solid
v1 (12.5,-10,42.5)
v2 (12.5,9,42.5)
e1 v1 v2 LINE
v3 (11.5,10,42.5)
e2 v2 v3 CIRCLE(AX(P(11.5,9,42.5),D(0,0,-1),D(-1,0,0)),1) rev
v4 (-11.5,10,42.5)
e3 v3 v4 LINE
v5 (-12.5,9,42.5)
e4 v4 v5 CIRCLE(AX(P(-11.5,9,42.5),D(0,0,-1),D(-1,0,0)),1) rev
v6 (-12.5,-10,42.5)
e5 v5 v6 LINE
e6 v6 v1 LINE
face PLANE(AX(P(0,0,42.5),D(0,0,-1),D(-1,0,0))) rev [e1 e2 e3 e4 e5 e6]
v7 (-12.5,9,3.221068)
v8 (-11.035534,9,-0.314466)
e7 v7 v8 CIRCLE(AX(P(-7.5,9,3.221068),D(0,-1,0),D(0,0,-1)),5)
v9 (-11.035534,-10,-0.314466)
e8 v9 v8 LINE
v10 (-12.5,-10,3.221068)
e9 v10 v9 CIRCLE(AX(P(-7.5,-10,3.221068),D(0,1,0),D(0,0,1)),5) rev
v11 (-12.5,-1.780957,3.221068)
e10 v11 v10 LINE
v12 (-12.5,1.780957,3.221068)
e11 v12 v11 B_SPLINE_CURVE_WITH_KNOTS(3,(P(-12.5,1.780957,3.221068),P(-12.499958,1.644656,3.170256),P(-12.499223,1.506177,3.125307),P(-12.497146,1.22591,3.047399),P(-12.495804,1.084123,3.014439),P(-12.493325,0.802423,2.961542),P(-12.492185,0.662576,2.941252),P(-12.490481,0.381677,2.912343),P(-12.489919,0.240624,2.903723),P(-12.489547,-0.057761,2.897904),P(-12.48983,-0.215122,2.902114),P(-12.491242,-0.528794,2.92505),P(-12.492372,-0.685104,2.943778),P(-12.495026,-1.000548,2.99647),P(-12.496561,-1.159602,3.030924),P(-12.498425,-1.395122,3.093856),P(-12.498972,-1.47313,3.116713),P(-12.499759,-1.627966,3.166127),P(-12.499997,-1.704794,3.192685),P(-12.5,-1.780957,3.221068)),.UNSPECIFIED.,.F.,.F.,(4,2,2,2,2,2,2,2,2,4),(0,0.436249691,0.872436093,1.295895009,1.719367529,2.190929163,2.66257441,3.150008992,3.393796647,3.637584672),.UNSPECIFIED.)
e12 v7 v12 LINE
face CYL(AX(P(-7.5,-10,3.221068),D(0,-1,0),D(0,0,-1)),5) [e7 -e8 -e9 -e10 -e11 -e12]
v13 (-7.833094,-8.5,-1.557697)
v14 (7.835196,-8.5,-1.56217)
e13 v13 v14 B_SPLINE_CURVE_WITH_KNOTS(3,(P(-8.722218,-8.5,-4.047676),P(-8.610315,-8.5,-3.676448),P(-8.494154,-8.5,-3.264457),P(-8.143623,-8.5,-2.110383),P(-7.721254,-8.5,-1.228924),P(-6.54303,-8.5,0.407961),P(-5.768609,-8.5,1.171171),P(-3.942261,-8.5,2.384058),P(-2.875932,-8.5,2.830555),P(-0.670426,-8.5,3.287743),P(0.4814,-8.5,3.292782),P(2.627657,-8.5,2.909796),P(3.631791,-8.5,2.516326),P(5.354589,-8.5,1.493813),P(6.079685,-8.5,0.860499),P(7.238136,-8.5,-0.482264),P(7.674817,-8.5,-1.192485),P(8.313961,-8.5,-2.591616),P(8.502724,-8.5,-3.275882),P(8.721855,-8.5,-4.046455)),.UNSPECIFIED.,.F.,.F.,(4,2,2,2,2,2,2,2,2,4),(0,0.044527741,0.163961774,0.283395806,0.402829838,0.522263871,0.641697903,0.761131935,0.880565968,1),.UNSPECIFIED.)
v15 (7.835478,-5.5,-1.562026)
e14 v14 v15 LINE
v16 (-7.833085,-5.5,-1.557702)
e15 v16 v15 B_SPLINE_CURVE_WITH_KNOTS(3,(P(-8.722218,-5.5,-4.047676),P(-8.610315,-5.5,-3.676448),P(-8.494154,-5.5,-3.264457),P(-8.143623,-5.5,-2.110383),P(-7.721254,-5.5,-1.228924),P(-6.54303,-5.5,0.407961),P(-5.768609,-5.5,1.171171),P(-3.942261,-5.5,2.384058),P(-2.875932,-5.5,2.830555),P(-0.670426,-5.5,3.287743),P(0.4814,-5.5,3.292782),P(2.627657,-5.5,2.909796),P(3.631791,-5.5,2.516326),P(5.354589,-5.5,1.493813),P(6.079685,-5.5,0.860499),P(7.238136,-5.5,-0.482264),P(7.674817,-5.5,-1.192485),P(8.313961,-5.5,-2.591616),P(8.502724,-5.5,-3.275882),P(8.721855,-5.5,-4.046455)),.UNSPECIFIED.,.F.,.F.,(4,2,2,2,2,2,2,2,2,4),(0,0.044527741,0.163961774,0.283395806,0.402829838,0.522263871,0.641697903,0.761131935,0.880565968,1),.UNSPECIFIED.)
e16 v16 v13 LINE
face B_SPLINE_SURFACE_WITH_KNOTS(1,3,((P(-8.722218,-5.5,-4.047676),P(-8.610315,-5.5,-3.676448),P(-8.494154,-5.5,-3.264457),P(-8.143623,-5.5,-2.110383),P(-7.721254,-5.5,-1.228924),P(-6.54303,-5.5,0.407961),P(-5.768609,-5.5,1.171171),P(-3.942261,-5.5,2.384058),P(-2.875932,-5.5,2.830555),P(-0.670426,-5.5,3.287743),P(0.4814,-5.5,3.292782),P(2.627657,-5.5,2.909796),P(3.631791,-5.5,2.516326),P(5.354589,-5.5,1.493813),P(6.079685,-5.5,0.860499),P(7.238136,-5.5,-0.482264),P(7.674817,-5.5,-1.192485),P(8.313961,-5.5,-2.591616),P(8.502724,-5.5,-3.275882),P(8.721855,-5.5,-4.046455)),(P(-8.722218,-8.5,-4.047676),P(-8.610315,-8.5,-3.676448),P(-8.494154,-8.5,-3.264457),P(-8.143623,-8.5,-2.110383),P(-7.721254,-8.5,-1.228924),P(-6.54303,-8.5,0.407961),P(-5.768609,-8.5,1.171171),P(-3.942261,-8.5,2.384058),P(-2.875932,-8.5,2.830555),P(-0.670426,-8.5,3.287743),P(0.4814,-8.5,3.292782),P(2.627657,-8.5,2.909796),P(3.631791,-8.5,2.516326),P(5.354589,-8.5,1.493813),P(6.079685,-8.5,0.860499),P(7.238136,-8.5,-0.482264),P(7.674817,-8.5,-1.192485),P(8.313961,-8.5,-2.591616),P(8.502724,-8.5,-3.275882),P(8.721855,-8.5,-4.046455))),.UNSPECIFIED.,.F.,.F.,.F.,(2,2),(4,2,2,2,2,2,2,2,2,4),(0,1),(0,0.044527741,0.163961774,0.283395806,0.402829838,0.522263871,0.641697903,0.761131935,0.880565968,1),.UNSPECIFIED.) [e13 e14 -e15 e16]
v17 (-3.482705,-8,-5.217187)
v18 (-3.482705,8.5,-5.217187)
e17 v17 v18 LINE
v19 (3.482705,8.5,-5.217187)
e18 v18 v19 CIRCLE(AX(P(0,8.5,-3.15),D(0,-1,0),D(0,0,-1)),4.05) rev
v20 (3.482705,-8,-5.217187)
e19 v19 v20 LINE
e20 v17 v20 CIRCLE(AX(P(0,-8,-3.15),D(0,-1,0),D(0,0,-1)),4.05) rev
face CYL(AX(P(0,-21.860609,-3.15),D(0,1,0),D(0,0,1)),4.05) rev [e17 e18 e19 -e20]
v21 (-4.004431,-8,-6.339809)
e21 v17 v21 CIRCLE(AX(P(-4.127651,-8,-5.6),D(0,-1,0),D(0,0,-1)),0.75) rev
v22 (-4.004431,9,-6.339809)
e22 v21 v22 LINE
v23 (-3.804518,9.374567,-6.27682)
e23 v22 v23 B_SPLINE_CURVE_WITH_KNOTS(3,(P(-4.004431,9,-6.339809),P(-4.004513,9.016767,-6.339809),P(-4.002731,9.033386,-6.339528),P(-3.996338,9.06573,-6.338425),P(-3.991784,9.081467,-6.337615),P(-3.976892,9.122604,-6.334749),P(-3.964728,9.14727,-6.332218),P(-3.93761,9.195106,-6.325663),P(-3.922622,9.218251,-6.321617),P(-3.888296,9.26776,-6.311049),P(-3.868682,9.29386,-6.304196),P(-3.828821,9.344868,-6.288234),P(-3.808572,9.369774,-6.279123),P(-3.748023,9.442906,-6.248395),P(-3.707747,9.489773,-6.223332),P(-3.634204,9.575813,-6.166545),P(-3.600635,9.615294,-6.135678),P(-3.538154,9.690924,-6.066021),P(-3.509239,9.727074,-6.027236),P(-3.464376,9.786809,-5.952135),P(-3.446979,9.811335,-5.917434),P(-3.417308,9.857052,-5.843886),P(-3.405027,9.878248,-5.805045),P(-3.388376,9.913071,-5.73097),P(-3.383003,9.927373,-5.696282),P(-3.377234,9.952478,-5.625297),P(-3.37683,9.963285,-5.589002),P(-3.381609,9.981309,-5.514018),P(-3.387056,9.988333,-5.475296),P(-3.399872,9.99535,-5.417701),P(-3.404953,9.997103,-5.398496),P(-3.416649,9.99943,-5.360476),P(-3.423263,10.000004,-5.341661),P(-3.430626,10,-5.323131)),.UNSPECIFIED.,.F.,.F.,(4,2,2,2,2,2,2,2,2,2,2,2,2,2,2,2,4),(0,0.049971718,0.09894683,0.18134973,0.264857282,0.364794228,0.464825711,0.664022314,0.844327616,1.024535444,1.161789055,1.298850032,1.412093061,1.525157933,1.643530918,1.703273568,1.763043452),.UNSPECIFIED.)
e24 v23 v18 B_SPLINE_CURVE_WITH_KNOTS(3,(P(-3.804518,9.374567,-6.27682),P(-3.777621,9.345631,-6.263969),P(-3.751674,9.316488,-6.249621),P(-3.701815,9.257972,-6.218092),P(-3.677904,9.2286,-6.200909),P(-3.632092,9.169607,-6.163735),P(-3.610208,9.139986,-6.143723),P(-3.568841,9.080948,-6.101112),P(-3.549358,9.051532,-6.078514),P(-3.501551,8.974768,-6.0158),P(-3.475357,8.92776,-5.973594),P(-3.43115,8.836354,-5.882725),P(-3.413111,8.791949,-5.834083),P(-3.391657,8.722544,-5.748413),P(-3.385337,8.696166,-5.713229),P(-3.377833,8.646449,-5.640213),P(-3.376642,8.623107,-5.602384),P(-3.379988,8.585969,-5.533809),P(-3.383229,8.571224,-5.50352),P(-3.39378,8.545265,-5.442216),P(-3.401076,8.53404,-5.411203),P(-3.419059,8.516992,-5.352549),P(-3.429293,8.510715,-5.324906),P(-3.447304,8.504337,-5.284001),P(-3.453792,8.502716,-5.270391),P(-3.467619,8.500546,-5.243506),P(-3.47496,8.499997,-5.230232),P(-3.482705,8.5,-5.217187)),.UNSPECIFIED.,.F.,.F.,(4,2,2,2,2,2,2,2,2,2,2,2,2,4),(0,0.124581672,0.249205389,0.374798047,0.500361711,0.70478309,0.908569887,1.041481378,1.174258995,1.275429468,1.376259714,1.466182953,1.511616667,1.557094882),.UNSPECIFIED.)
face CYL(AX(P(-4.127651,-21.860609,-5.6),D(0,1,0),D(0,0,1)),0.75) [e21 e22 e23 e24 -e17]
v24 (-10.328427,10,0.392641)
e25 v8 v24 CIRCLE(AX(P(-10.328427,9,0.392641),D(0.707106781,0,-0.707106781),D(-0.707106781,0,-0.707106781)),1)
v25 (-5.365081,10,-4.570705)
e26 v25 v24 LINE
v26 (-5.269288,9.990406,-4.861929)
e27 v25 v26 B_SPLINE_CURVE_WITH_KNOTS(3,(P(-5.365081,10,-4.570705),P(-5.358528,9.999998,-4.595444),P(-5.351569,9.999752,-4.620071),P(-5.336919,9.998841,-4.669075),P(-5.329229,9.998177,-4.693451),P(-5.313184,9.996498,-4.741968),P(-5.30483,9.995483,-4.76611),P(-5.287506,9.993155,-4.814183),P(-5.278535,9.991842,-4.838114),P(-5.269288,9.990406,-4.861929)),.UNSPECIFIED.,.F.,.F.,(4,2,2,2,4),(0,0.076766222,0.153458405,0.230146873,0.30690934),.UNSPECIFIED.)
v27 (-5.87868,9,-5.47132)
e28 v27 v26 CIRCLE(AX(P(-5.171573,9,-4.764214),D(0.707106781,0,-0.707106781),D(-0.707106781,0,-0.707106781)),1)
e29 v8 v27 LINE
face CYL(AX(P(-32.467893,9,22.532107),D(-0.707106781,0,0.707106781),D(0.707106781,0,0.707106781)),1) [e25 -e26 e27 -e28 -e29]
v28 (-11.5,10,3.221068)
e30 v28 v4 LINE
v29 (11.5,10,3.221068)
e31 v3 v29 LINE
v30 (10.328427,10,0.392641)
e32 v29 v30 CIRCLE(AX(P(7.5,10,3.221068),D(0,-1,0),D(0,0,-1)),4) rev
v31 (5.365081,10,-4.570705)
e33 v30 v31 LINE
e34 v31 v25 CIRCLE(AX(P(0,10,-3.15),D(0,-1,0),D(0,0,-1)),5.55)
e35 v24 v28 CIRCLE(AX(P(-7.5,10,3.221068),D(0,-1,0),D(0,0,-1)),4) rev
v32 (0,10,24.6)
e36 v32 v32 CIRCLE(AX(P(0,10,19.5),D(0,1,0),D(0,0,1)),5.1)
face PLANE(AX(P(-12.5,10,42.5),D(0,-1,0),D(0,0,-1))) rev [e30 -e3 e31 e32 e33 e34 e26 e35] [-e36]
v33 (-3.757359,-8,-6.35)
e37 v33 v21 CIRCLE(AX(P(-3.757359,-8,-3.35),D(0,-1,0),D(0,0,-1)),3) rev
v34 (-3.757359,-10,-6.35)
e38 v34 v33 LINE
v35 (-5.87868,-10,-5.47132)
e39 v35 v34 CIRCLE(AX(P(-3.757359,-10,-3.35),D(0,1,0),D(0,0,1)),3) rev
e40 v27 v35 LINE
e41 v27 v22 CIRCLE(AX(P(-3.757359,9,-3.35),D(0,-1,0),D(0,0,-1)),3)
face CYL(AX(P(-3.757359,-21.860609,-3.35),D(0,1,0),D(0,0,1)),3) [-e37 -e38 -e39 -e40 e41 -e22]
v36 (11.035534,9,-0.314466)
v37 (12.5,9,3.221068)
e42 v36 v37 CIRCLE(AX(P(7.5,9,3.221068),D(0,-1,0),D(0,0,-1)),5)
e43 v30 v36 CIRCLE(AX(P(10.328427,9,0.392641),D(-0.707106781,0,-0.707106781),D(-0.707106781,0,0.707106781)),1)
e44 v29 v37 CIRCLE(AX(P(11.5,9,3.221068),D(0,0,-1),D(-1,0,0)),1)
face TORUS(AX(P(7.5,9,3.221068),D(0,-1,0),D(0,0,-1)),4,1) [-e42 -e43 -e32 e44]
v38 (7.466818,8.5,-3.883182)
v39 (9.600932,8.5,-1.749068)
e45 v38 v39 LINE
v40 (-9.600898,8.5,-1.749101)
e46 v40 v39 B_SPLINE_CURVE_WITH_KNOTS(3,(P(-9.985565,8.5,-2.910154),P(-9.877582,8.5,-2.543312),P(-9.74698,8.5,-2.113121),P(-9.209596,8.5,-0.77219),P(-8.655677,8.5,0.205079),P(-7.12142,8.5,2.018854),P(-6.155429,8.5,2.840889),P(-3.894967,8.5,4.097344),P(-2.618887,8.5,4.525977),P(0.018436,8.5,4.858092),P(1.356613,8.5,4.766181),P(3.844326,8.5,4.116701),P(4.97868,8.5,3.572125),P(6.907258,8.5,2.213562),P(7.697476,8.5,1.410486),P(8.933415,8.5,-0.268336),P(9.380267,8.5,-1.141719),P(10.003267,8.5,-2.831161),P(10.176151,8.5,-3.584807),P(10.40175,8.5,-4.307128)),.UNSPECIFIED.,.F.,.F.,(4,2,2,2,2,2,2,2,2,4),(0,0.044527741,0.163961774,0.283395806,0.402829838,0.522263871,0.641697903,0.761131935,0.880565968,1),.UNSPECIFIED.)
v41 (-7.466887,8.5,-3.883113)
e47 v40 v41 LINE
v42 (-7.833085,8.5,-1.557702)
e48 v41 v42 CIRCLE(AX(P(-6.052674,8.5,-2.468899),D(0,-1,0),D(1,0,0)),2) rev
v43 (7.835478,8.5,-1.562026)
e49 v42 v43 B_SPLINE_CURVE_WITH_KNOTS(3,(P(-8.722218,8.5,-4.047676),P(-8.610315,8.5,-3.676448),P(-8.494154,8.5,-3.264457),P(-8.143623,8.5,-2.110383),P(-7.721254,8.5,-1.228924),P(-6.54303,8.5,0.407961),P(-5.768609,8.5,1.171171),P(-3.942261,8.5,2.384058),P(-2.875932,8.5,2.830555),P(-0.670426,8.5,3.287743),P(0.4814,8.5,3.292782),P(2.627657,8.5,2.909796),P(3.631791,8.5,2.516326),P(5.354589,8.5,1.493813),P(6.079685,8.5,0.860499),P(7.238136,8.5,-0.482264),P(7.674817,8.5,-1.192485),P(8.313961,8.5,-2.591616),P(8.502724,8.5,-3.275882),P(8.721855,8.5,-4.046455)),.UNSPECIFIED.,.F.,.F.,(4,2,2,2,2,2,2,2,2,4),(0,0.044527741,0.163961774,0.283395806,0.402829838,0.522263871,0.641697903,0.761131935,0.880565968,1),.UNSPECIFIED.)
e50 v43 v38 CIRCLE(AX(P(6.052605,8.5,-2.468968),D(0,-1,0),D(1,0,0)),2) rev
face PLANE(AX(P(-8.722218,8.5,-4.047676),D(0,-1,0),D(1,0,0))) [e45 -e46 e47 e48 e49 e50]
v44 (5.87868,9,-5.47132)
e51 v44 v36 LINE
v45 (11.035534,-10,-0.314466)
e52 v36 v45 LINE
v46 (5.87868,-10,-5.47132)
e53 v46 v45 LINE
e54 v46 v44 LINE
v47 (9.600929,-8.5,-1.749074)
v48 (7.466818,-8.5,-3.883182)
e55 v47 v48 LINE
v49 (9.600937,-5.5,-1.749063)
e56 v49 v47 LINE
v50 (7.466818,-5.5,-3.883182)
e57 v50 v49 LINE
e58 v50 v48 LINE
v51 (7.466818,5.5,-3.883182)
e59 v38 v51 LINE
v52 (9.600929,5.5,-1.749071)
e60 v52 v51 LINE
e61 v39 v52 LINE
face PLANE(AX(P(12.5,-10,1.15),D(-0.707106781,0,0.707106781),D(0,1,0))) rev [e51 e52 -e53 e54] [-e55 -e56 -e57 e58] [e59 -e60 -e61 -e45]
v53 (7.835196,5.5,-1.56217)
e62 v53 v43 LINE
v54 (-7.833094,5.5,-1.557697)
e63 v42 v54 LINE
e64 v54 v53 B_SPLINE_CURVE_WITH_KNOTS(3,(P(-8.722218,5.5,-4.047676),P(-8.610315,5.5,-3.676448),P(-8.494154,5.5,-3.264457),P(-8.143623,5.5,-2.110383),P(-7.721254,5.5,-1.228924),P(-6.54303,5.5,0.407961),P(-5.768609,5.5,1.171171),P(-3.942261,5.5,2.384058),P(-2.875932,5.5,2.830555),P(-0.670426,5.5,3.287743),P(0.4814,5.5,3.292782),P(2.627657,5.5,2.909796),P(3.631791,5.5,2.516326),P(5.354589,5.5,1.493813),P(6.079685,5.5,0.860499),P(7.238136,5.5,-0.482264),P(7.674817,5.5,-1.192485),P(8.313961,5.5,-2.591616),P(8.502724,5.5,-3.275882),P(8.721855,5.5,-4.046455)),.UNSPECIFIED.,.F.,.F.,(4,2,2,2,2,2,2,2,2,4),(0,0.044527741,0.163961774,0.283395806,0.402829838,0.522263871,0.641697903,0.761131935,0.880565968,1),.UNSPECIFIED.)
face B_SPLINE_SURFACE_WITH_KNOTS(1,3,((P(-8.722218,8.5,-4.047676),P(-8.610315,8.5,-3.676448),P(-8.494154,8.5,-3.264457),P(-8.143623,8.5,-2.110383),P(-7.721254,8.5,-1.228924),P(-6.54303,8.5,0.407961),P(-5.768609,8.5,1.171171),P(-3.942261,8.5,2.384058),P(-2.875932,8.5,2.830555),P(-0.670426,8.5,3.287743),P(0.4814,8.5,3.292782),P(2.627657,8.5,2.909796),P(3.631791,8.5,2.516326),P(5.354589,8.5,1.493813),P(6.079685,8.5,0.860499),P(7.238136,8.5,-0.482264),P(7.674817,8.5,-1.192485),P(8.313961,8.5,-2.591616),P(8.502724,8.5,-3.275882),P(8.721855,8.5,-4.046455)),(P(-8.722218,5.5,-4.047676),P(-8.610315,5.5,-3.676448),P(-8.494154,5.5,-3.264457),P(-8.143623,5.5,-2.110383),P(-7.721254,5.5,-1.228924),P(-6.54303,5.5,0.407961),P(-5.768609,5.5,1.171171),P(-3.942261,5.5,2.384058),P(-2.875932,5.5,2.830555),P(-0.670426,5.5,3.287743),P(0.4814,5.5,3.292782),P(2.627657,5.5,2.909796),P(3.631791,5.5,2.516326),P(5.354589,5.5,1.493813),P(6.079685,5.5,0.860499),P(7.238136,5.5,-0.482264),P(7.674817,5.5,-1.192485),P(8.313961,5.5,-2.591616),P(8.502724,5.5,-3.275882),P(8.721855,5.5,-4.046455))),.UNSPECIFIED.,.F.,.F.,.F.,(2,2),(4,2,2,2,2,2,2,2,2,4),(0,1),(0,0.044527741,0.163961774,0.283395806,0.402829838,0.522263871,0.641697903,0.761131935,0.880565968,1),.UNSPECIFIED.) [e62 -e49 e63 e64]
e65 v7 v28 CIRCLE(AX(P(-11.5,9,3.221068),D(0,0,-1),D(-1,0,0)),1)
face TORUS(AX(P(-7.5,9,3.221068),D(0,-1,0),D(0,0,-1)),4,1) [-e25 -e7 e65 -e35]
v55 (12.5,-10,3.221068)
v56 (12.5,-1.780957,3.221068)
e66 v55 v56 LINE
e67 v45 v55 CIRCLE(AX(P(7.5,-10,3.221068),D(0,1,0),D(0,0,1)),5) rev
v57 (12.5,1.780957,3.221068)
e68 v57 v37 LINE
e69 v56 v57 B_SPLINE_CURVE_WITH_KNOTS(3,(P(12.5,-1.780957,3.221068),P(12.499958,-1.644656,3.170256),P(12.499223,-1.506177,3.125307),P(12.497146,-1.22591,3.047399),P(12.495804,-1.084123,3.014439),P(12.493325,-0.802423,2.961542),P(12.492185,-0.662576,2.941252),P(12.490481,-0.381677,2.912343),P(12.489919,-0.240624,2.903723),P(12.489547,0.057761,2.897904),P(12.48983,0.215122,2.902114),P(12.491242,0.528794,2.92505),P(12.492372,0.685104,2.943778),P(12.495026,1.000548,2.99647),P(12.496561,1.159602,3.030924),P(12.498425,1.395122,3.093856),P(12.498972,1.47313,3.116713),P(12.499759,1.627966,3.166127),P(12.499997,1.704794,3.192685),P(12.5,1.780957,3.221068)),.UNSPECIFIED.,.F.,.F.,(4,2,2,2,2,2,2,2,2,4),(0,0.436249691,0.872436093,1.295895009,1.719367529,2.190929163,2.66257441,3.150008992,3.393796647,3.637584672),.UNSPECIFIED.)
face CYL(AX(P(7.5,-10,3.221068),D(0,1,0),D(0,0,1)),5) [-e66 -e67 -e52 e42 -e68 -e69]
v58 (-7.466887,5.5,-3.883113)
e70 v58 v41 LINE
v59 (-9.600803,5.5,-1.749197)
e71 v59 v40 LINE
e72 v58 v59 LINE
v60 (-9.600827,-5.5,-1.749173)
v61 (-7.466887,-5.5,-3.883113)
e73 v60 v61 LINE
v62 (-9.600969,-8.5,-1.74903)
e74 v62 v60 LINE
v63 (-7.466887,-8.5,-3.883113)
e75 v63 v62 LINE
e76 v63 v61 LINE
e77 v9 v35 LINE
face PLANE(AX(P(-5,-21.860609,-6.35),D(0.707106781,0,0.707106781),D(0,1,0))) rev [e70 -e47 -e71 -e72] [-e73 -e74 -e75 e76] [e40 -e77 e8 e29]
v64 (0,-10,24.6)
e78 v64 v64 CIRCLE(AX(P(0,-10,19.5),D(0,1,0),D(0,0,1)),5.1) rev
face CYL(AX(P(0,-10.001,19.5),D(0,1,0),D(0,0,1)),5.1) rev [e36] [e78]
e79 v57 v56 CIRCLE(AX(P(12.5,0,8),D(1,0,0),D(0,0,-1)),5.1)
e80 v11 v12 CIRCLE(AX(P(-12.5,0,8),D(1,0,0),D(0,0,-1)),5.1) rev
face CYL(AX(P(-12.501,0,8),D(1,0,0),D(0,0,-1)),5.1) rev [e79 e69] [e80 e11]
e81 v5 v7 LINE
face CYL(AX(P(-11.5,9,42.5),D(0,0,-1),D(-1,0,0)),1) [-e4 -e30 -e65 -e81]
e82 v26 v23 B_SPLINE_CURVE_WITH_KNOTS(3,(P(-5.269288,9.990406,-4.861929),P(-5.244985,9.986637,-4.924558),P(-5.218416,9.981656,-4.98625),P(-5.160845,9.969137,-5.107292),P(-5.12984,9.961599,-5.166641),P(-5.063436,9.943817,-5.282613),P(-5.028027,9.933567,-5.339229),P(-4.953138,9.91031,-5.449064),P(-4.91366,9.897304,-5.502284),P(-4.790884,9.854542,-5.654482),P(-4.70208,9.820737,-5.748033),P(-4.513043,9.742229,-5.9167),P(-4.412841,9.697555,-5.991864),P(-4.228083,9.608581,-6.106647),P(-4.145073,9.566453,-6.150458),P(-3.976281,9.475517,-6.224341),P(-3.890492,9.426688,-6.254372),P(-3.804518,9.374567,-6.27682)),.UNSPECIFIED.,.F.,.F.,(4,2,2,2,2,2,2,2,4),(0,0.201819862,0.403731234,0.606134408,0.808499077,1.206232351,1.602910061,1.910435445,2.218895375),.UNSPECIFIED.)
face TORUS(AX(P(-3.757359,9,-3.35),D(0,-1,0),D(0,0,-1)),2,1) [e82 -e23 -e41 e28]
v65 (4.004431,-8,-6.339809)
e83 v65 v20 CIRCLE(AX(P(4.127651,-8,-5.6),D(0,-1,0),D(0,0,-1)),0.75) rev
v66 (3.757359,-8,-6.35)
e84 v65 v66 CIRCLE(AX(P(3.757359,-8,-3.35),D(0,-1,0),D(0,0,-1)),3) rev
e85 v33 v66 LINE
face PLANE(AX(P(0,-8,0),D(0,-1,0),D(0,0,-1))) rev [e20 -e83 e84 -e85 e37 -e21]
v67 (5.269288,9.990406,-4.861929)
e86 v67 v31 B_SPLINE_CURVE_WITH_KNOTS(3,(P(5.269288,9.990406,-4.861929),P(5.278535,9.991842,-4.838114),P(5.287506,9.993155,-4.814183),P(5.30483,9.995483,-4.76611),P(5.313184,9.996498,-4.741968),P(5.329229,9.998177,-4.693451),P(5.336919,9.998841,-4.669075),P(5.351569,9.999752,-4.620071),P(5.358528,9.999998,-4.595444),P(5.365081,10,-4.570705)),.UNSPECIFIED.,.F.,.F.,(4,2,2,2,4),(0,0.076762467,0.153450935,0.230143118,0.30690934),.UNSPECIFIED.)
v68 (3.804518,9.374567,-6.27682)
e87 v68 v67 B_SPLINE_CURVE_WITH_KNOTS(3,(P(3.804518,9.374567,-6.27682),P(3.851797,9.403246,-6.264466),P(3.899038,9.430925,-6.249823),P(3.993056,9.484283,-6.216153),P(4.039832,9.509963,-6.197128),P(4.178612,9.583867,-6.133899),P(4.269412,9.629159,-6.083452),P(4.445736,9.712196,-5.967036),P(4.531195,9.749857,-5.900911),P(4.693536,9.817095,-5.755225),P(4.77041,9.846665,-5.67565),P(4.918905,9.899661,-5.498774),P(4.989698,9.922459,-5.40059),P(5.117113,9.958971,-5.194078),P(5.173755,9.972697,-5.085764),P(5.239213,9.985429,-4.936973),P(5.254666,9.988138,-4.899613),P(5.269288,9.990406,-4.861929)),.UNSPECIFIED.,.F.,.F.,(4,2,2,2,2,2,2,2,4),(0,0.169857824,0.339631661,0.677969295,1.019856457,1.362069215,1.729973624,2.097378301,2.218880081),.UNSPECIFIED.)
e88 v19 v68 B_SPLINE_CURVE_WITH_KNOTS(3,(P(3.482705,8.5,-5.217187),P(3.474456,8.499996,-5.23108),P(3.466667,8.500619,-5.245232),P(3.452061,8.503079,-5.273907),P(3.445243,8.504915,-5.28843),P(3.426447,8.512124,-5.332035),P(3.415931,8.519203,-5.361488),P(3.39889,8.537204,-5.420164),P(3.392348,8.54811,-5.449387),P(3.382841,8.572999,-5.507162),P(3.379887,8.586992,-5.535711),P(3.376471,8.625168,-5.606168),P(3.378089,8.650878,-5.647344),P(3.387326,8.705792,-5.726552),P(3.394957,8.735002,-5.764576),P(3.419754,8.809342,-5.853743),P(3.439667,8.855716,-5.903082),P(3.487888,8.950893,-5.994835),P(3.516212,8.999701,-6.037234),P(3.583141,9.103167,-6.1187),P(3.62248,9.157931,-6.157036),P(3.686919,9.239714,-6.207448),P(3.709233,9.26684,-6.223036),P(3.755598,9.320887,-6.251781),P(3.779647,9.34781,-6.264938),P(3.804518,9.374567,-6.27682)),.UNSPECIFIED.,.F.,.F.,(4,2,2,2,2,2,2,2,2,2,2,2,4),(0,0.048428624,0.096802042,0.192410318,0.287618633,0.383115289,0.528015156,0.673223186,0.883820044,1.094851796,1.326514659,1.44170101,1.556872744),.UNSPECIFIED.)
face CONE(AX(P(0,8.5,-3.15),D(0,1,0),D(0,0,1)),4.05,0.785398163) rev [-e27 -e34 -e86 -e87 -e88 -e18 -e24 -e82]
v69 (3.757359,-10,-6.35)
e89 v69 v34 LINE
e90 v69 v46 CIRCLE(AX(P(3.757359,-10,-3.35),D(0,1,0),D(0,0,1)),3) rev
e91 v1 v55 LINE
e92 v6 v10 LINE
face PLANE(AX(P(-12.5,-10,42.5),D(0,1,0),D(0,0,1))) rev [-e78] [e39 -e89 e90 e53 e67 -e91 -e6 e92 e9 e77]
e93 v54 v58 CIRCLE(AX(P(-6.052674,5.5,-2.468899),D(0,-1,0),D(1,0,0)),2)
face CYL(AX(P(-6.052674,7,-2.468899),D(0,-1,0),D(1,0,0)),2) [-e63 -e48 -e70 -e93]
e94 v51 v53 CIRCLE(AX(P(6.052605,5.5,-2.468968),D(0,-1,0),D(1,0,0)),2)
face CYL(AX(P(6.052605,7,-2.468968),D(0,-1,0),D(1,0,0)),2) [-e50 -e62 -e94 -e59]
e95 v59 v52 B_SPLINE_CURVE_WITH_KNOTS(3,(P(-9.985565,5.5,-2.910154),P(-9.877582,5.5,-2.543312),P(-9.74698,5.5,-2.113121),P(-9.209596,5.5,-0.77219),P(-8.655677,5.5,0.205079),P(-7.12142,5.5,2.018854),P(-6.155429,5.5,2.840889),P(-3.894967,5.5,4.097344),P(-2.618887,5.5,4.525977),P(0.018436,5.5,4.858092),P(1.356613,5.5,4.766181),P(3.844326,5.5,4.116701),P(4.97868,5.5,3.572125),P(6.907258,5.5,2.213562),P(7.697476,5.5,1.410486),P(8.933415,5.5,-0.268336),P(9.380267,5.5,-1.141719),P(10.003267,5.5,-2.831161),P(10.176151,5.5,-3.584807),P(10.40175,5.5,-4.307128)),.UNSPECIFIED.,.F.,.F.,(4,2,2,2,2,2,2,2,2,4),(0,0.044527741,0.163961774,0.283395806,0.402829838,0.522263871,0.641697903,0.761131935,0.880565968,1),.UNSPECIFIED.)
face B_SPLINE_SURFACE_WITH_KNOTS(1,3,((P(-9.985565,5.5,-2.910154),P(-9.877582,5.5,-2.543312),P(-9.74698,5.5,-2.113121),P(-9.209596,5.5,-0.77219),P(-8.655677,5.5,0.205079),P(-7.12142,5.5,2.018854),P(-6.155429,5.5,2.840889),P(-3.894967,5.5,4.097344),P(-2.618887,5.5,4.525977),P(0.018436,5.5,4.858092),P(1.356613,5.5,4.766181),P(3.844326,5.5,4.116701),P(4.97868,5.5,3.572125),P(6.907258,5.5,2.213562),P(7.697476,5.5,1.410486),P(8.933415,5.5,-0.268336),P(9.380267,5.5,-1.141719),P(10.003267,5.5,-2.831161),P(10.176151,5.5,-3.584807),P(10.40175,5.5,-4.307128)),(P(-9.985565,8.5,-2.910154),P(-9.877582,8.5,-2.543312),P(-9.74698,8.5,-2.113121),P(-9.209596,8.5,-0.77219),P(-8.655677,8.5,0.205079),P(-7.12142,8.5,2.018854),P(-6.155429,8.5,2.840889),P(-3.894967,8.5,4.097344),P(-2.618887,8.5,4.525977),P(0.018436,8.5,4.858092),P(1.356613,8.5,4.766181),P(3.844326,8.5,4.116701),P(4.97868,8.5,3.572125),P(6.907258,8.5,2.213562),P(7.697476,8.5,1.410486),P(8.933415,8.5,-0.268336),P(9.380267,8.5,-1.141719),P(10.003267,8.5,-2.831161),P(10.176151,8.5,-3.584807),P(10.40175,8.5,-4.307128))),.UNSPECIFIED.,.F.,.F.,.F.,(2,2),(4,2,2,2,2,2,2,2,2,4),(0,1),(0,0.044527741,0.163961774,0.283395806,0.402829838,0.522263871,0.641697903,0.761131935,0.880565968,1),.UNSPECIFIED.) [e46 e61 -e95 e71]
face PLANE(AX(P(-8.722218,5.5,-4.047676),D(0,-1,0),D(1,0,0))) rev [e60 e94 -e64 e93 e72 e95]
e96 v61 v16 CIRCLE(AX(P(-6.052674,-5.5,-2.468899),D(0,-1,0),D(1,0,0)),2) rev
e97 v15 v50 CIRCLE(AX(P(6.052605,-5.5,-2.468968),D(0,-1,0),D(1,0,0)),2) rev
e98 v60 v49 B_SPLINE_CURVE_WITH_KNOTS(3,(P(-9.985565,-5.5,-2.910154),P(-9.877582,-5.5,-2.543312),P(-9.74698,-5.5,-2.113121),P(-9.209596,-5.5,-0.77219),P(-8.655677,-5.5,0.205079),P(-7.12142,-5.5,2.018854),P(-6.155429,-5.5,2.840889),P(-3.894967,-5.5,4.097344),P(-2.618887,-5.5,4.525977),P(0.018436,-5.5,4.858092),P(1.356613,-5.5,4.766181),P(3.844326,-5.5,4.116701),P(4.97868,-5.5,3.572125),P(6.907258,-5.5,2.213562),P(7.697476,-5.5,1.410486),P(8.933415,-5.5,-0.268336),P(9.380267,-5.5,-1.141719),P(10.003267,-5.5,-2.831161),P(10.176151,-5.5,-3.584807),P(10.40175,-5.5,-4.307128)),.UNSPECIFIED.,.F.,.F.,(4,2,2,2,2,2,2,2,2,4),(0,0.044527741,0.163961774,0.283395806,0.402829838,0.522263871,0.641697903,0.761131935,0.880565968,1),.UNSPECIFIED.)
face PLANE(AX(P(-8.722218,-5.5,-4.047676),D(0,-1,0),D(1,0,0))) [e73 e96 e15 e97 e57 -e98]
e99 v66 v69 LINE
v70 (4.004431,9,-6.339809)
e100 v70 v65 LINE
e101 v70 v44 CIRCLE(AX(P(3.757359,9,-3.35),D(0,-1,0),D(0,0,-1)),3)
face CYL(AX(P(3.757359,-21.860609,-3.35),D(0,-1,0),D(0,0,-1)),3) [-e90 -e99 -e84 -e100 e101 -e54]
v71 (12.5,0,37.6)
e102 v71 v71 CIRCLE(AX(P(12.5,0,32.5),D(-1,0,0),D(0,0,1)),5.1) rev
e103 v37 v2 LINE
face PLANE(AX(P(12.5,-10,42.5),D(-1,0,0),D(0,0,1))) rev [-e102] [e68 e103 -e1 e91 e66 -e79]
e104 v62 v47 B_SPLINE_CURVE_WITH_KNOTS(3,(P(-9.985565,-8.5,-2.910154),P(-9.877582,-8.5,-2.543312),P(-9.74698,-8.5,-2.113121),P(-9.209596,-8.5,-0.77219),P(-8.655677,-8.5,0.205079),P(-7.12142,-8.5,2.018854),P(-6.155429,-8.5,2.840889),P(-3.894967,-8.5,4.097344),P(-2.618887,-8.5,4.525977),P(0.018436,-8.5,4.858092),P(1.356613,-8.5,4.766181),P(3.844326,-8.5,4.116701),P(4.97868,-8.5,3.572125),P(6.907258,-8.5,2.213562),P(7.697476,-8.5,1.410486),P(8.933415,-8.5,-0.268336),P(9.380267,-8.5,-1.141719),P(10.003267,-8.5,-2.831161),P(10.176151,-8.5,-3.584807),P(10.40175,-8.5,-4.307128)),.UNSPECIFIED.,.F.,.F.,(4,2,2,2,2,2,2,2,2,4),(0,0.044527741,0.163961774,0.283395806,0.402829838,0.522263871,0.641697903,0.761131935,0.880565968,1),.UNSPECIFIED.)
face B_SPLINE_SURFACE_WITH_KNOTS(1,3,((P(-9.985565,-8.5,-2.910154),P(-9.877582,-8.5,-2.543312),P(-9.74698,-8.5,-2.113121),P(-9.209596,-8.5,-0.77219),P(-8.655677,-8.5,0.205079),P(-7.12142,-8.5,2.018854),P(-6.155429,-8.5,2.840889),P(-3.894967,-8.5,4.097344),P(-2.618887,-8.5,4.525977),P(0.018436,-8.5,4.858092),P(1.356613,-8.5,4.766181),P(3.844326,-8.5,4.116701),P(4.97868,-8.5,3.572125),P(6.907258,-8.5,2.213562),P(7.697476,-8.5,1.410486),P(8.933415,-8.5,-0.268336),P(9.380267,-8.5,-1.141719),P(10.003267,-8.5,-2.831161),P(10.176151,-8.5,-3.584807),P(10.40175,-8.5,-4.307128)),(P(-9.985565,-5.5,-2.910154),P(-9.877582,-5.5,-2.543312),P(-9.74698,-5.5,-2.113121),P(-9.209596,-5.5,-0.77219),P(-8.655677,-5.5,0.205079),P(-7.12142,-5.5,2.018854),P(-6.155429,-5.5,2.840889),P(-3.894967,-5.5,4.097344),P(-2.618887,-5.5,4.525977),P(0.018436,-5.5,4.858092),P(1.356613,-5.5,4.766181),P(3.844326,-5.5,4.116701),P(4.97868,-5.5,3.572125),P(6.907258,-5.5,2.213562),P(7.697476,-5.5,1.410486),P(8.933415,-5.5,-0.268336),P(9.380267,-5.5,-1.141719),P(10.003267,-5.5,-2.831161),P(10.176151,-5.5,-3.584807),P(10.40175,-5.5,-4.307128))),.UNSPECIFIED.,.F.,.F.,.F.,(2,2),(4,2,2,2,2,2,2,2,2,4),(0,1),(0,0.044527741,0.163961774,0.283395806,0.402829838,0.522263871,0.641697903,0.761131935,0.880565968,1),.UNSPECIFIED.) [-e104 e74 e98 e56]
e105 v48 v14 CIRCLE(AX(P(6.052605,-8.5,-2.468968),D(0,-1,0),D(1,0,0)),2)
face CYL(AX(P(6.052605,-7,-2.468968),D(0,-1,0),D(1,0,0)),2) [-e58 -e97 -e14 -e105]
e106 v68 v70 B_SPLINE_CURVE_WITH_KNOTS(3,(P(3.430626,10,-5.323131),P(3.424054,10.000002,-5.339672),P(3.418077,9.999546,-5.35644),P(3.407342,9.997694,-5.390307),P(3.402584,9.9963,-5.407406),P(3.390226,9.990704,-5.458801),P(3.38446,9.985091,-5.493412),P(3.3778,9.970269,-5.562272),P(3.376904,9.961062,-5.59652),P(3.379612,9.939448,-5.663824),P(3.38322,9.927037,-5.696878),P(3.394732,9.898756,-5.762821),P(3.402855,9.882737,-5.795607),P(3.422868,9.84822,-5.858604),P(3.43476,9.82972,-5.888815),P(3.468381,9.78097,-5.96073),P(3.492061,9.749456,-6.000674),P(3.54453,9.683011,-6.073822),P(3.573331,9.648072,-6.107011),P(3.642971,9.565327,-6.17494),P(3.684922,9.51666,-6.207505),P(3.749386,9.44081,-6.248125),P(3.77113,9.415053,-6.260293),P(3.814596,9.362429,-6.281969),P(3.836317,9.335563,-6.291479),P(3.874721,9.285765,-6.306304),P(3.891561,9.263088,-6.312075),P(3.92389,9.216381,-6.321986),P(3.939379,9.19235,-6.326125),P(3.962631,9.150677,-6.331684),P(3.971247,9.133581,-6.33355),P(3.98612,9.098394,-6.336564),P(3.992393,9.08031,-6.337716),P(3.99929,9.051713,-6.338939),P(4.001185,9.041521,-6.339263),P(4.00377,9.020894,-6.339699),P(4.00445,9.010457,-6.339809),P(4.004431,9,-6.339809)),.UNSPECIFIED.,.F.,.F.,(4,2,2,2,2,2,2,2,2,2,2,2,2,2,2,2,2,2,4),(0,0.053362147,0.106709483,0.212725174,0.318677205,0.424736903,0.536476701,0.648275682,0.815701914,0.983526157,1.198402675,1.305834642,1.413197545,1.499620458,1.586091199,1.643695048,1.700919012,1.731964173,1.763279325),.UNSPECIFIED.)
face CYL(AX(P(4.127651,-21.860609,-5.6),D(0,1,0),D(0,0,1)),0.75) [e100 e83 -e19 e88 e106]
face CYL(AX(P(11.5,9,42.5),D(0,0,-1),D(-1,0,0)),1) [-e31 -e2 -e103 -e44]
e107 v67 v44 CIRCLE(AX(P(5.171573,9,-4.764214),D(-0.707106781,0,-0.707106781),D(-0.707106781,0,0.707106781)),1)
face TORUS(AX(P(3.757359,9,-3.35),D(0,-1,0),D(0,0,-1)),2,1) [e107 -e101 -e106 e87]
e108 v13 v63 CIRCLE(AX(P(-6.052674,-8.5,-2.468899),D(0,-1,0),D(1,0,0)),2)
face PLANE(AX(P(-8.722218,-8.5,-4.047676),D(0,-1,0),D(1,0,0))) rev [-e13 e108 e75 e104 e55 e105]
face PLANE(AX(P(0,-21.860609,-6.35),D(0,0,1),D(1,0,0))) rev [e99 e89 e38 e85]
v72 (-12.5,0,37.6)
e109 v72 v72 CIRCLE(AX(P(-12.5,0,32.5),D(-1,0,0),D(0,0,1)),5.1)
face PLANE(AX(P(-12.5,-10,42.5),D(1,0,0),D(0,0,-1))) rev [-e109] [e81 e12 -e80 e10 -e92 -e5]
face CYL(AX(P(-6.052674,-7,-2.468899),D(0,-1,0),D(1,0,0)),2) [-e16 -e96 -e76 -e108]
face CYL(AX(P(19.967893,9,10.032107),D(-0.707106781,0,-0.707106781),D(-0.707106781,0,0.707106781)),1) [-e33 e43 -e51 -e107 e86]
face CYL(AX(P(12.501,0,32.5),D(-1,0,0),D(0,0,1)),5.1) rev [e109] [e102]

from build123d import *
from OCP.BRepAlgoAPI import BRepAlgoAPI_Cut
from OCP.TopTools import TopTools_ListOfShape

# Parameters (mm, degrees)
SZKIC1_W                               = 25
SZKIC1_H                               = 20
DODANIE_WYCI_GNI_CIE1_DEPTH            = 42.5
WYTNIJ_WYCI_GNI_CIE1_REACH             = 52.312
SZKIC2_R                               = 5.1
WYTNIJ_WYCI_GNI_CIE2_REACH             = 50.606
SZKIC3_R                               = 5.1
DODANIE_WYCI_GNI_CIE2_START            = -20
DODANIE_WYCI_GNI_CIE2_DEPTH            = 20
ZAOKR_GLENIE2_R                        = 0.75
SZKIC7_W                               = 25
SZKIC7_H                               = 15
DODANIE_WYCI_GNI_CIE3_DEPTH            = 2
WYTNIJ_WYCI_GNI_CIE4_REACH             = 49.817
SZKIC8_R                               = 4.05
SFAZOWANIE1_SIZE                       = 7.5
WYCI_CIE_WYCI_GNI_CIE_START            = 5.5
WYCI_CIE_WYCI_GNI_CIE_PO_CIE_CE1_DEPTH = 3
ZAOKR_GLENIE3_R                        = 2
ZAOKR_GLENIE4_START                    = -11
ZAOKR_GLENIE4_DEPTH                    = 22
ZAOKR_GLENIE3_OF_LUSTRO2_R             = 2
ZAOKR_GLENIE5_R                        = 5
ZAOKR_GLENIE6_R                        = 1
SFAZOWANIE2_SIZE                       = 1.5
WYTNIJ_WYCI_GNI_CIE5_REACH             = 52.312
SZKIC12_R                              = 5.1


with BuildPart() as part:
    # Szkic1 → Dodanie-wyciągnięcie1 (new body)
    with BuildSketch(Plane.XY):
        Rectangle(SZKIC1_W, SZKIC1_H)
    extrude(amount=DODANIE_WYCI_GNI_CIE1_DEPTH)

    # Szkic2 → Wytnij-wyciągnięcie1 (cut, up to next)
    with BuildSketch(Plane(origin=(12.5, 0, 0), x_dir=(0, 0, -1), z_dir=(1, 0, 0)), mode=Mode.PRIVATE) as wytnij_wyci_gni_cie1_sk1:
        with Locations((-8, 0)):
            Circle(SZKIC2_R)
    wytnij_wyci_gni_cie1_tool1 = extrude(wytnij_wyci_gni_cie1_sk1.sketch, amount=-WYTNIJ_WYCI_GNI_CIE1_REACH, mode=Mode.PRIVATE) & part.part
    add(wytnij_wyci_gni_cie1_tool1.solids().sort_by_distance((12.5, 0, 8))[0], mode=Mode.SUBTRACT)

    # Szkic3 → Wytnij-wyciągnięcie2 (cut, up to next)
    with BuildSketch(Plane(origin=(0, 10, 0), x_dir=(1, 0, 0), z_dir=(0, 1, 0)), mode=Mode.PRIVATE) as wytnij_wyci_gni_cie2_sk1:
        with Locations(Location((0, -19.5, 0), (0, 0, 270))):
            Circle(SZKIC3_R)
    wytnij_wyci_gni_cie2_tool1 = extrude(wytnij_wyci_gni_cie2_sk1.sketch, amount=-WYTNIJ_WYCI_GNI_CIE2_REACH, mode=Mode.PRIVATE) & part.part
    add(wytnij_wyci_gni_cie2_tool1.solids().sort_by_distance((0, 10, 19.5))[0], mode=Mode.SUBTRACT)

    # Dodanie-wyciągnięcie2: read off the stored shape, not the designer's step
    # Dodanie-wyciągnięcie2 outline → Dodanie-wyciągnięcie2 (add)
    with BuildSketch(Plane(origin=(0, 10, 0), x_dir=(1, 0, 0), z_dir=(0, 1, 0)).offset(DODANIE_WYCI_GNI_CIE2_START)):
        with BuildLine():
            Line((-12.5, 0), (-2.545584412, 0))
            ThreePointArc((-2.545584412, 0), (-4.049799766, 3.19027229), (-2.482438317, 6.35))
            Line((-2.482438317, 6.35), (-12.5, 6.35))
            Line((-12.5, 6.35), (-12.5, 0))
        make_face()
        with BuildLine():
            Line((12.5, 0), (12.5, 6.35))
            Line((12.5, 6.35), (2.482438317, 6.35))
            ThreePointArc((2.482438317, 6.35), (4.049799766, 3.19027229), (2.545584412, 0))
            Line((2.545584412, 0), (12.5, 0))
        make_face()
    extrude(amount=DODANIE_WYCI_GNI_CIE2_DEPTH)

    # Zaokrąglenie2
    zaokr_glenie2_edges = [part.edges().sort_by_distance(p)[0] for p in [
        (-2.482438317, 0, -6.35),
        (2.482438317, 0, -6.35),
    ]]
    fillet(zaokr_glenie2_edges, radius=ZAOKR_GLENIE2_R)

    # Szkic7 → Dodanie-wyciągnięcie3 (add)
    with BuildSketch(Plane.XZ.offset(10)):
        with Locations((0, 1.15)):
            Rectangle(SZKIC7_W, SZKIC7_H)
    extrude(amount=-DODANIE_WYCI_GNI_CIE3_DEPTH)

    # Szkic8 → Wytnij-wyciągnięcie4 (cut, up to next)
    with BuildSketch(Plane(origin=(0, -8, 0), x_dir=(1, 0, 0), z_dir=(0, 1, 0)), mode=Mode.PRIVATE) as wytnij_wyci_gni_cie4_sk1:
        with Locations((0, 3.15)):
            Circle(SZKIC8_R)
    wytnij_wyci_gni_cie4_tool1 = extrude(wytnij_wyci_gni_cie4_sk1.sketch, amount=WYTNIJ_WYCI_GNI_CIE4_REACH, mode=Mode.PRIVATE) & part.part
    add(wytnij_wyci_gni_cie4_tool1.solids().sort_by_distance((0, -8, -3.15))[0], mode=Mode.SUBTRACT)

    # Sfazowanie1
    sfazowanie1_edges = [part.edges().sort_by_distance(p)[0] for p in [
        (-12.5, 0, -6.35),
        (12.5, 0, -6.35),
    ]]
    chamfer(sfazowanie1_edges, length=SFAZOWANIE1_SIZE)


with BuildPart() as wyci_cie_wyci_gni_cie_po_cie_ce1_tool:
    # Wycięcie-wyciągnięcie po ścieżce1: read off the stored shape, not the designer's step
    # Wycięcie-wyciągnięcie po ścieżce1 outlin → Wycięcie-wyciągnięcie po ścieżce1 (new body)
    with BuildSketch(Plane(origin=(0, 0, 0), x_dir=(1, 0, 0), z_dir=(0, 1, 0)).offset(WYCI_CIE_WYCI_GNI_CIE_START)):
        with BuildLine():
            Line((-8.398959236, 2.951040764), (-9.601040764, 1.748959236))
            add(Edge.make_bspline(
                [(-9.601040764, 1.748959236), (-9.209595956, 0.772190109), (-8.65567701, -0.205079485), (-7.121419805, -2.018854383), (-6.15542851, -2.840889353), (-3.89496705, -4.097344098), (-2.618886758, -4.525976788), (0.018436022, -4.858092268), (1.356613032, -4.766181401), (3.844325913, -4.116700841), (4.978679647, -3.572124587), (6.907257886, -2.213562211), (7.697476445, -1.410485572), (8.875702434, 0.189942932), (9.295310391, 0.978883557), (9.600922152, 1.74907375)],
                knots=[0.044527741, 0.044527741, 0.044527741, 0.044527741, 0.163961774, 0.163961774, 0.283395806, 0.283395806, 0.402829838, 0.402829838, 0.522263871, 0.522263871, 0.641697903, 0.641697903, 0.761131935, 0.761131935, 0.869411924, 0.869411924, 0.869411924, 0.869411924], degree=3))
            Line((9.600922152, 1.74907375), (8.398612397, 2.951387603))
            add(Edge.make_bspline(
                [(-8.398959236, 2.951040764), (-8.143623085, 2.110383322), (-7.721254142, 1.22892436), (-6.543030407, -0.407961014), (-5.768609422, -1.171170966), (-3.942260695, -2.384057538), (-2.87593166, -2.830554933), (-0.670426419, -3.287743264), (0.481400093, -3.292782379), (2.627656604, -2.909796026), (3.631791424, -2.516326215), (5.35458893, -1.493813298), (6.079684963, -0.860499), (7.238136236, 0.482263814), (7.674817273, 1.192485201), (8.155489955, 2.24471168), (8.28334822, 2.593485223), (8.398612397, 2.951387603)],
                knots=[0.044527741, 0.044527741, 0.044527741, 0.044527741, 0.163961774, 0.163961774, 0.283395806, 0.283395806, 0.402829838, 0.402829838, 0.522263871, 0.522263871, 0.641697903, 0.641697903, 0.761131935, 0.761131935, 0.880565968, 0.880565968, 0.940774458, 0.940774458, 0.940774458, 0.940774458], degree=3))
        make_face()
    wyci_cie_wyci_gni_cie_po_cie_ce1 = extrude(amount=WYCI_CIE_WYCI_GNI_CIE_PO_CIE_CE1_DEPTH)


with BuildPart() as part_1:
    add(part.part)

    # Wycięcie-wyciągnięcie po ścieżce1: cut by wyci_cie_wyci_gni_cie_po_cie_ce1_tool, with a tolerance
    wyci_cie_wyci_gni_cie_po_cie_ce1_stock = TopTools_ListOfShape()
    wyci_cie_wyci_gni_cie_po_cie_ce1_stock.Append(part_1.part.wrapped)
    wyci_cie_wyci_gni_cie_po_cie_ce1_tools = TopTools_ListOfShape()
    wyci_cie_wyci_gni_cie_po_cie_ce1_tools.Append(wyci_cie_wyci_gni_cie_po_cie_ce1_tool.part.wrapped)
    wyci_cie_wyci_gni_cie_po_cie_ce1_cut = BRepAlgoAPI_Cut()
    wyci_cie_wyci_gni_cie_po_cie_ce1_cut.SetArguments(wyci_cie_wyci_gni_cie_po_cie_ce1_stock)
    wyci_cie_wyci_gni_cie_po_cie_ce1_cut.SetTools(wyci_cie_wyci_gni_cie_po_cie_ce1_tools)
    wyci_cie_wyci_gni_cie_po_cie_ce1_cut.SetFuzzyValue(0.00001)
    wyci_cie_wyci_gni_cie_po_cie_ce1_cut.Build()
    add(Compound.cast(wyci_cie_wyci_gni_cie_po_cie_ce1_cut.Shape()).solids(), mode=Mode.REPLACE)

    # Zaokrąglenie3
    zaokr_glenie3_edges = [part_1.edges().sort_by_distance(p)[0] for p in [
        (-8.398959236, 7, -2.951040764),
        (8.398612397, 7, -2.951387603),
    ]]
    fillet(zaokr_glenie3_edges, radius=ZAOKR_GLENIE3_R)

    # Zaokrąglenie4: read off the stored shape, not the designer's step
    # Zaokrąglenie4 outline → Zaokrąglenie4 (cut)
    with BuildSketch(Plane(origin=(0, 0, 0), x_dir=(1, 0, 0), z_dir=(0, 1, 0)).offset(ZAOKR_GLENIE4_START)):
        with BuildLine():
            Line((5, 6.35), (3.757359313, 6.35))
            ThreePointArc((3.757359313, 6.35), (4.90540961, 6.121638598), (5.878679656, 5.471320344))
            Line((5.878679656, 5.471320344), (5, 6.35))
        make_face()
        with BuildLine():
            ThreePointArc((-5.878679656, 5.471320344), (-4.90540961, 6.121638598), (-3.757359313, 6.35))
            Line((-3.757359313, 6.35), (-5, 6.35))
            Line((-5, 6.35), (-5.878679656, 5.471320344))
        make_face()
    extrude(amount=ZAOKR_GLENIE4_DEPTH, mode=Mode.SUBTRACT)

    # Lustro2: Wycięcie-wyciągnięcie po ścieżce1 across plane
    add(wyci_cie_wyci_gni_cie_po_cie_ce1.mirror(Plane.ZX), mode=Mode.SUBTRACT)

    # Zaokrąglenie3 of Lustro2
    zaokr_glenie3_of_lustro2_edges = [part_1.edges().sort_by_distance(p)[0] for p in [
        (-8.398959236, -7, -2.951040764),
        (8.398612397, -7, -2.951387603),
    ]]
    fillet(zaokr_glenie3_of_lustro2_edges, radius=ZAOKR_GLENIE3_OF_LUSTRO2_R)

    # Zaokrąglenie5
    # the kernel refuses this fillet: 5 mm, written as the material it takes off along each edge
    with BuildSketch(Plane(origin=(-12.5, 15.17766953, 1.15), x_dir=(0.7071067811865477, 0, -0.7071067811865472), z_dir=(0, -1, 0)), Plane(origin=(12.5, -15.17766953, 1.15), x_dir=(-0.7071067811865474, 0, -0.7071067811865476), z_dir=(0, 1, 0))) as zaokr_glenie5_piece_1:
        with BuildLine():
            CenterArc((ZAOKR_GLENIE5_R * 0.414213562373, ZAOKR_GLENIE5_R), ZAOKR_GLENIE5_R, 225, 45)
            Line((-ZAOKR_GLENIE5_R * 0.292893218813, ZAOKR_GLENIE5_R * 0.292893218813), (0, 0))
            Line((0, 0), (ZAOKR_GLENIE5_R * 0.414213562373, 0))
        make_face()
    extrude(amount=30.355339059, mode=Mode.SUBTRACT)

    # Zaokrąglenie6
    zaokr_glenie6_edges = [part_1.edges().sort_by_distance(p)[0] for p in [
        (-8.457106781, 10, -2.892893219),
        (-5.01866332, 10, -6.071968443),
        (5.01866332, 10, -6.071968443),
        (8.457106781, 10, -2.892893219),
        (12.119397663, 10, 1.30765065),
        (-12.119397663, 10, 1.30765065),
        (-12.5, 10, 22.860533906),
        (12.5, 10, 22.860533906),
    ]]
    fillet(zaokr_glenie6_edges, radius=ZAOKR_GLENIE6_R)

    # Sfazowanie2
    # the kernel refuses this chamfer: 1.5 mm, written as the material it takes off along each edge
    with BuildSketch(Plane(origin=(1e-09, 10, -3.15), x_dir=(0.08224322624349094, 0, -0.9966122875707795), z_dir=(-0.9966122875707795, 0, -0.08224322624349094))) as sfazowanie2_piece_1:
        Polygon((4.049999999 + SFAZOWANIE2_SIZE, 0), (4.049999999, SFAZOWANIE2_SIZE), (4.049999999, 0), align=None)
    revolve(axis=Axis((1e-09, 10, -3.15), (0, -1, 0)), revolution_arc=136.340040588, mode=Mode.SUBTRACT)
    with BuildSketch(Plane(origin=(-1e-09, 10, -3.15), x_dir=(-0.6285393608328834, 0, 0.7777777779570398), z_dir=(0.7777777779570398, 0, 0.6285393608328834))) as sfazowanie2_piece_2:
        Polygon((4.049999999 + SFAZOWANIE2_SIZE, 0), (4.049999999, SFAZOWANIE2_SIZE), (4.049999999, 0), align=None)
    revolve(axis=Axis((-1e-09, 10, -3.15), (0, -1, 0)), revolution_arc=136.340040588, mode=Mode.SUBTRACT)
    with BuildSketch(Plane(origin=(0, 10, -3.15), x_dir=(0.6285393610141453, 0, 0.7777777778105581), z_dir=(0.7777777778105581, 0, -0.6285393610141453))) as sfazowanie2_piece_3:
        Polygon((4.05 + SFAZOWANIE2_SIZE, 0), (4.05, SFAZOWANIE2_SIZE), (4.05, 0), align=None)
    revolve(axis=Axis((0, 10, -3.15), (0, -1, 0)), revolution_arc=77.884882532, mode=Mode.SUBTRACT)

    # Szkic12 → Wytnij-wyciągnięcie5 (cut, up to next)
    with BuildSketch(Plane.ZY.offset(12.5), mode=Mode.PRIVATE) as wytnij_wyci_gni_cie5_sk1:
        with Locations((32.5, 0)):
            Circle(SZKIC12_R)
    wytnij_wyci_gni_cie5_tool1 = extrude(wytnij_wyci_gni_cie5_sk1.sketch, amount=-WYTNIJ_WYCI_GNI_CIE5_REACH, mode=Mode.PRIVATE) & part_1.part
    add(wytnij_wyci_gni_cie5_tool1.solids().sort_by_distance((-12.5, 0, 32.5))[0], mode=Mode.SUBTRACT)


solid = part_1.part
